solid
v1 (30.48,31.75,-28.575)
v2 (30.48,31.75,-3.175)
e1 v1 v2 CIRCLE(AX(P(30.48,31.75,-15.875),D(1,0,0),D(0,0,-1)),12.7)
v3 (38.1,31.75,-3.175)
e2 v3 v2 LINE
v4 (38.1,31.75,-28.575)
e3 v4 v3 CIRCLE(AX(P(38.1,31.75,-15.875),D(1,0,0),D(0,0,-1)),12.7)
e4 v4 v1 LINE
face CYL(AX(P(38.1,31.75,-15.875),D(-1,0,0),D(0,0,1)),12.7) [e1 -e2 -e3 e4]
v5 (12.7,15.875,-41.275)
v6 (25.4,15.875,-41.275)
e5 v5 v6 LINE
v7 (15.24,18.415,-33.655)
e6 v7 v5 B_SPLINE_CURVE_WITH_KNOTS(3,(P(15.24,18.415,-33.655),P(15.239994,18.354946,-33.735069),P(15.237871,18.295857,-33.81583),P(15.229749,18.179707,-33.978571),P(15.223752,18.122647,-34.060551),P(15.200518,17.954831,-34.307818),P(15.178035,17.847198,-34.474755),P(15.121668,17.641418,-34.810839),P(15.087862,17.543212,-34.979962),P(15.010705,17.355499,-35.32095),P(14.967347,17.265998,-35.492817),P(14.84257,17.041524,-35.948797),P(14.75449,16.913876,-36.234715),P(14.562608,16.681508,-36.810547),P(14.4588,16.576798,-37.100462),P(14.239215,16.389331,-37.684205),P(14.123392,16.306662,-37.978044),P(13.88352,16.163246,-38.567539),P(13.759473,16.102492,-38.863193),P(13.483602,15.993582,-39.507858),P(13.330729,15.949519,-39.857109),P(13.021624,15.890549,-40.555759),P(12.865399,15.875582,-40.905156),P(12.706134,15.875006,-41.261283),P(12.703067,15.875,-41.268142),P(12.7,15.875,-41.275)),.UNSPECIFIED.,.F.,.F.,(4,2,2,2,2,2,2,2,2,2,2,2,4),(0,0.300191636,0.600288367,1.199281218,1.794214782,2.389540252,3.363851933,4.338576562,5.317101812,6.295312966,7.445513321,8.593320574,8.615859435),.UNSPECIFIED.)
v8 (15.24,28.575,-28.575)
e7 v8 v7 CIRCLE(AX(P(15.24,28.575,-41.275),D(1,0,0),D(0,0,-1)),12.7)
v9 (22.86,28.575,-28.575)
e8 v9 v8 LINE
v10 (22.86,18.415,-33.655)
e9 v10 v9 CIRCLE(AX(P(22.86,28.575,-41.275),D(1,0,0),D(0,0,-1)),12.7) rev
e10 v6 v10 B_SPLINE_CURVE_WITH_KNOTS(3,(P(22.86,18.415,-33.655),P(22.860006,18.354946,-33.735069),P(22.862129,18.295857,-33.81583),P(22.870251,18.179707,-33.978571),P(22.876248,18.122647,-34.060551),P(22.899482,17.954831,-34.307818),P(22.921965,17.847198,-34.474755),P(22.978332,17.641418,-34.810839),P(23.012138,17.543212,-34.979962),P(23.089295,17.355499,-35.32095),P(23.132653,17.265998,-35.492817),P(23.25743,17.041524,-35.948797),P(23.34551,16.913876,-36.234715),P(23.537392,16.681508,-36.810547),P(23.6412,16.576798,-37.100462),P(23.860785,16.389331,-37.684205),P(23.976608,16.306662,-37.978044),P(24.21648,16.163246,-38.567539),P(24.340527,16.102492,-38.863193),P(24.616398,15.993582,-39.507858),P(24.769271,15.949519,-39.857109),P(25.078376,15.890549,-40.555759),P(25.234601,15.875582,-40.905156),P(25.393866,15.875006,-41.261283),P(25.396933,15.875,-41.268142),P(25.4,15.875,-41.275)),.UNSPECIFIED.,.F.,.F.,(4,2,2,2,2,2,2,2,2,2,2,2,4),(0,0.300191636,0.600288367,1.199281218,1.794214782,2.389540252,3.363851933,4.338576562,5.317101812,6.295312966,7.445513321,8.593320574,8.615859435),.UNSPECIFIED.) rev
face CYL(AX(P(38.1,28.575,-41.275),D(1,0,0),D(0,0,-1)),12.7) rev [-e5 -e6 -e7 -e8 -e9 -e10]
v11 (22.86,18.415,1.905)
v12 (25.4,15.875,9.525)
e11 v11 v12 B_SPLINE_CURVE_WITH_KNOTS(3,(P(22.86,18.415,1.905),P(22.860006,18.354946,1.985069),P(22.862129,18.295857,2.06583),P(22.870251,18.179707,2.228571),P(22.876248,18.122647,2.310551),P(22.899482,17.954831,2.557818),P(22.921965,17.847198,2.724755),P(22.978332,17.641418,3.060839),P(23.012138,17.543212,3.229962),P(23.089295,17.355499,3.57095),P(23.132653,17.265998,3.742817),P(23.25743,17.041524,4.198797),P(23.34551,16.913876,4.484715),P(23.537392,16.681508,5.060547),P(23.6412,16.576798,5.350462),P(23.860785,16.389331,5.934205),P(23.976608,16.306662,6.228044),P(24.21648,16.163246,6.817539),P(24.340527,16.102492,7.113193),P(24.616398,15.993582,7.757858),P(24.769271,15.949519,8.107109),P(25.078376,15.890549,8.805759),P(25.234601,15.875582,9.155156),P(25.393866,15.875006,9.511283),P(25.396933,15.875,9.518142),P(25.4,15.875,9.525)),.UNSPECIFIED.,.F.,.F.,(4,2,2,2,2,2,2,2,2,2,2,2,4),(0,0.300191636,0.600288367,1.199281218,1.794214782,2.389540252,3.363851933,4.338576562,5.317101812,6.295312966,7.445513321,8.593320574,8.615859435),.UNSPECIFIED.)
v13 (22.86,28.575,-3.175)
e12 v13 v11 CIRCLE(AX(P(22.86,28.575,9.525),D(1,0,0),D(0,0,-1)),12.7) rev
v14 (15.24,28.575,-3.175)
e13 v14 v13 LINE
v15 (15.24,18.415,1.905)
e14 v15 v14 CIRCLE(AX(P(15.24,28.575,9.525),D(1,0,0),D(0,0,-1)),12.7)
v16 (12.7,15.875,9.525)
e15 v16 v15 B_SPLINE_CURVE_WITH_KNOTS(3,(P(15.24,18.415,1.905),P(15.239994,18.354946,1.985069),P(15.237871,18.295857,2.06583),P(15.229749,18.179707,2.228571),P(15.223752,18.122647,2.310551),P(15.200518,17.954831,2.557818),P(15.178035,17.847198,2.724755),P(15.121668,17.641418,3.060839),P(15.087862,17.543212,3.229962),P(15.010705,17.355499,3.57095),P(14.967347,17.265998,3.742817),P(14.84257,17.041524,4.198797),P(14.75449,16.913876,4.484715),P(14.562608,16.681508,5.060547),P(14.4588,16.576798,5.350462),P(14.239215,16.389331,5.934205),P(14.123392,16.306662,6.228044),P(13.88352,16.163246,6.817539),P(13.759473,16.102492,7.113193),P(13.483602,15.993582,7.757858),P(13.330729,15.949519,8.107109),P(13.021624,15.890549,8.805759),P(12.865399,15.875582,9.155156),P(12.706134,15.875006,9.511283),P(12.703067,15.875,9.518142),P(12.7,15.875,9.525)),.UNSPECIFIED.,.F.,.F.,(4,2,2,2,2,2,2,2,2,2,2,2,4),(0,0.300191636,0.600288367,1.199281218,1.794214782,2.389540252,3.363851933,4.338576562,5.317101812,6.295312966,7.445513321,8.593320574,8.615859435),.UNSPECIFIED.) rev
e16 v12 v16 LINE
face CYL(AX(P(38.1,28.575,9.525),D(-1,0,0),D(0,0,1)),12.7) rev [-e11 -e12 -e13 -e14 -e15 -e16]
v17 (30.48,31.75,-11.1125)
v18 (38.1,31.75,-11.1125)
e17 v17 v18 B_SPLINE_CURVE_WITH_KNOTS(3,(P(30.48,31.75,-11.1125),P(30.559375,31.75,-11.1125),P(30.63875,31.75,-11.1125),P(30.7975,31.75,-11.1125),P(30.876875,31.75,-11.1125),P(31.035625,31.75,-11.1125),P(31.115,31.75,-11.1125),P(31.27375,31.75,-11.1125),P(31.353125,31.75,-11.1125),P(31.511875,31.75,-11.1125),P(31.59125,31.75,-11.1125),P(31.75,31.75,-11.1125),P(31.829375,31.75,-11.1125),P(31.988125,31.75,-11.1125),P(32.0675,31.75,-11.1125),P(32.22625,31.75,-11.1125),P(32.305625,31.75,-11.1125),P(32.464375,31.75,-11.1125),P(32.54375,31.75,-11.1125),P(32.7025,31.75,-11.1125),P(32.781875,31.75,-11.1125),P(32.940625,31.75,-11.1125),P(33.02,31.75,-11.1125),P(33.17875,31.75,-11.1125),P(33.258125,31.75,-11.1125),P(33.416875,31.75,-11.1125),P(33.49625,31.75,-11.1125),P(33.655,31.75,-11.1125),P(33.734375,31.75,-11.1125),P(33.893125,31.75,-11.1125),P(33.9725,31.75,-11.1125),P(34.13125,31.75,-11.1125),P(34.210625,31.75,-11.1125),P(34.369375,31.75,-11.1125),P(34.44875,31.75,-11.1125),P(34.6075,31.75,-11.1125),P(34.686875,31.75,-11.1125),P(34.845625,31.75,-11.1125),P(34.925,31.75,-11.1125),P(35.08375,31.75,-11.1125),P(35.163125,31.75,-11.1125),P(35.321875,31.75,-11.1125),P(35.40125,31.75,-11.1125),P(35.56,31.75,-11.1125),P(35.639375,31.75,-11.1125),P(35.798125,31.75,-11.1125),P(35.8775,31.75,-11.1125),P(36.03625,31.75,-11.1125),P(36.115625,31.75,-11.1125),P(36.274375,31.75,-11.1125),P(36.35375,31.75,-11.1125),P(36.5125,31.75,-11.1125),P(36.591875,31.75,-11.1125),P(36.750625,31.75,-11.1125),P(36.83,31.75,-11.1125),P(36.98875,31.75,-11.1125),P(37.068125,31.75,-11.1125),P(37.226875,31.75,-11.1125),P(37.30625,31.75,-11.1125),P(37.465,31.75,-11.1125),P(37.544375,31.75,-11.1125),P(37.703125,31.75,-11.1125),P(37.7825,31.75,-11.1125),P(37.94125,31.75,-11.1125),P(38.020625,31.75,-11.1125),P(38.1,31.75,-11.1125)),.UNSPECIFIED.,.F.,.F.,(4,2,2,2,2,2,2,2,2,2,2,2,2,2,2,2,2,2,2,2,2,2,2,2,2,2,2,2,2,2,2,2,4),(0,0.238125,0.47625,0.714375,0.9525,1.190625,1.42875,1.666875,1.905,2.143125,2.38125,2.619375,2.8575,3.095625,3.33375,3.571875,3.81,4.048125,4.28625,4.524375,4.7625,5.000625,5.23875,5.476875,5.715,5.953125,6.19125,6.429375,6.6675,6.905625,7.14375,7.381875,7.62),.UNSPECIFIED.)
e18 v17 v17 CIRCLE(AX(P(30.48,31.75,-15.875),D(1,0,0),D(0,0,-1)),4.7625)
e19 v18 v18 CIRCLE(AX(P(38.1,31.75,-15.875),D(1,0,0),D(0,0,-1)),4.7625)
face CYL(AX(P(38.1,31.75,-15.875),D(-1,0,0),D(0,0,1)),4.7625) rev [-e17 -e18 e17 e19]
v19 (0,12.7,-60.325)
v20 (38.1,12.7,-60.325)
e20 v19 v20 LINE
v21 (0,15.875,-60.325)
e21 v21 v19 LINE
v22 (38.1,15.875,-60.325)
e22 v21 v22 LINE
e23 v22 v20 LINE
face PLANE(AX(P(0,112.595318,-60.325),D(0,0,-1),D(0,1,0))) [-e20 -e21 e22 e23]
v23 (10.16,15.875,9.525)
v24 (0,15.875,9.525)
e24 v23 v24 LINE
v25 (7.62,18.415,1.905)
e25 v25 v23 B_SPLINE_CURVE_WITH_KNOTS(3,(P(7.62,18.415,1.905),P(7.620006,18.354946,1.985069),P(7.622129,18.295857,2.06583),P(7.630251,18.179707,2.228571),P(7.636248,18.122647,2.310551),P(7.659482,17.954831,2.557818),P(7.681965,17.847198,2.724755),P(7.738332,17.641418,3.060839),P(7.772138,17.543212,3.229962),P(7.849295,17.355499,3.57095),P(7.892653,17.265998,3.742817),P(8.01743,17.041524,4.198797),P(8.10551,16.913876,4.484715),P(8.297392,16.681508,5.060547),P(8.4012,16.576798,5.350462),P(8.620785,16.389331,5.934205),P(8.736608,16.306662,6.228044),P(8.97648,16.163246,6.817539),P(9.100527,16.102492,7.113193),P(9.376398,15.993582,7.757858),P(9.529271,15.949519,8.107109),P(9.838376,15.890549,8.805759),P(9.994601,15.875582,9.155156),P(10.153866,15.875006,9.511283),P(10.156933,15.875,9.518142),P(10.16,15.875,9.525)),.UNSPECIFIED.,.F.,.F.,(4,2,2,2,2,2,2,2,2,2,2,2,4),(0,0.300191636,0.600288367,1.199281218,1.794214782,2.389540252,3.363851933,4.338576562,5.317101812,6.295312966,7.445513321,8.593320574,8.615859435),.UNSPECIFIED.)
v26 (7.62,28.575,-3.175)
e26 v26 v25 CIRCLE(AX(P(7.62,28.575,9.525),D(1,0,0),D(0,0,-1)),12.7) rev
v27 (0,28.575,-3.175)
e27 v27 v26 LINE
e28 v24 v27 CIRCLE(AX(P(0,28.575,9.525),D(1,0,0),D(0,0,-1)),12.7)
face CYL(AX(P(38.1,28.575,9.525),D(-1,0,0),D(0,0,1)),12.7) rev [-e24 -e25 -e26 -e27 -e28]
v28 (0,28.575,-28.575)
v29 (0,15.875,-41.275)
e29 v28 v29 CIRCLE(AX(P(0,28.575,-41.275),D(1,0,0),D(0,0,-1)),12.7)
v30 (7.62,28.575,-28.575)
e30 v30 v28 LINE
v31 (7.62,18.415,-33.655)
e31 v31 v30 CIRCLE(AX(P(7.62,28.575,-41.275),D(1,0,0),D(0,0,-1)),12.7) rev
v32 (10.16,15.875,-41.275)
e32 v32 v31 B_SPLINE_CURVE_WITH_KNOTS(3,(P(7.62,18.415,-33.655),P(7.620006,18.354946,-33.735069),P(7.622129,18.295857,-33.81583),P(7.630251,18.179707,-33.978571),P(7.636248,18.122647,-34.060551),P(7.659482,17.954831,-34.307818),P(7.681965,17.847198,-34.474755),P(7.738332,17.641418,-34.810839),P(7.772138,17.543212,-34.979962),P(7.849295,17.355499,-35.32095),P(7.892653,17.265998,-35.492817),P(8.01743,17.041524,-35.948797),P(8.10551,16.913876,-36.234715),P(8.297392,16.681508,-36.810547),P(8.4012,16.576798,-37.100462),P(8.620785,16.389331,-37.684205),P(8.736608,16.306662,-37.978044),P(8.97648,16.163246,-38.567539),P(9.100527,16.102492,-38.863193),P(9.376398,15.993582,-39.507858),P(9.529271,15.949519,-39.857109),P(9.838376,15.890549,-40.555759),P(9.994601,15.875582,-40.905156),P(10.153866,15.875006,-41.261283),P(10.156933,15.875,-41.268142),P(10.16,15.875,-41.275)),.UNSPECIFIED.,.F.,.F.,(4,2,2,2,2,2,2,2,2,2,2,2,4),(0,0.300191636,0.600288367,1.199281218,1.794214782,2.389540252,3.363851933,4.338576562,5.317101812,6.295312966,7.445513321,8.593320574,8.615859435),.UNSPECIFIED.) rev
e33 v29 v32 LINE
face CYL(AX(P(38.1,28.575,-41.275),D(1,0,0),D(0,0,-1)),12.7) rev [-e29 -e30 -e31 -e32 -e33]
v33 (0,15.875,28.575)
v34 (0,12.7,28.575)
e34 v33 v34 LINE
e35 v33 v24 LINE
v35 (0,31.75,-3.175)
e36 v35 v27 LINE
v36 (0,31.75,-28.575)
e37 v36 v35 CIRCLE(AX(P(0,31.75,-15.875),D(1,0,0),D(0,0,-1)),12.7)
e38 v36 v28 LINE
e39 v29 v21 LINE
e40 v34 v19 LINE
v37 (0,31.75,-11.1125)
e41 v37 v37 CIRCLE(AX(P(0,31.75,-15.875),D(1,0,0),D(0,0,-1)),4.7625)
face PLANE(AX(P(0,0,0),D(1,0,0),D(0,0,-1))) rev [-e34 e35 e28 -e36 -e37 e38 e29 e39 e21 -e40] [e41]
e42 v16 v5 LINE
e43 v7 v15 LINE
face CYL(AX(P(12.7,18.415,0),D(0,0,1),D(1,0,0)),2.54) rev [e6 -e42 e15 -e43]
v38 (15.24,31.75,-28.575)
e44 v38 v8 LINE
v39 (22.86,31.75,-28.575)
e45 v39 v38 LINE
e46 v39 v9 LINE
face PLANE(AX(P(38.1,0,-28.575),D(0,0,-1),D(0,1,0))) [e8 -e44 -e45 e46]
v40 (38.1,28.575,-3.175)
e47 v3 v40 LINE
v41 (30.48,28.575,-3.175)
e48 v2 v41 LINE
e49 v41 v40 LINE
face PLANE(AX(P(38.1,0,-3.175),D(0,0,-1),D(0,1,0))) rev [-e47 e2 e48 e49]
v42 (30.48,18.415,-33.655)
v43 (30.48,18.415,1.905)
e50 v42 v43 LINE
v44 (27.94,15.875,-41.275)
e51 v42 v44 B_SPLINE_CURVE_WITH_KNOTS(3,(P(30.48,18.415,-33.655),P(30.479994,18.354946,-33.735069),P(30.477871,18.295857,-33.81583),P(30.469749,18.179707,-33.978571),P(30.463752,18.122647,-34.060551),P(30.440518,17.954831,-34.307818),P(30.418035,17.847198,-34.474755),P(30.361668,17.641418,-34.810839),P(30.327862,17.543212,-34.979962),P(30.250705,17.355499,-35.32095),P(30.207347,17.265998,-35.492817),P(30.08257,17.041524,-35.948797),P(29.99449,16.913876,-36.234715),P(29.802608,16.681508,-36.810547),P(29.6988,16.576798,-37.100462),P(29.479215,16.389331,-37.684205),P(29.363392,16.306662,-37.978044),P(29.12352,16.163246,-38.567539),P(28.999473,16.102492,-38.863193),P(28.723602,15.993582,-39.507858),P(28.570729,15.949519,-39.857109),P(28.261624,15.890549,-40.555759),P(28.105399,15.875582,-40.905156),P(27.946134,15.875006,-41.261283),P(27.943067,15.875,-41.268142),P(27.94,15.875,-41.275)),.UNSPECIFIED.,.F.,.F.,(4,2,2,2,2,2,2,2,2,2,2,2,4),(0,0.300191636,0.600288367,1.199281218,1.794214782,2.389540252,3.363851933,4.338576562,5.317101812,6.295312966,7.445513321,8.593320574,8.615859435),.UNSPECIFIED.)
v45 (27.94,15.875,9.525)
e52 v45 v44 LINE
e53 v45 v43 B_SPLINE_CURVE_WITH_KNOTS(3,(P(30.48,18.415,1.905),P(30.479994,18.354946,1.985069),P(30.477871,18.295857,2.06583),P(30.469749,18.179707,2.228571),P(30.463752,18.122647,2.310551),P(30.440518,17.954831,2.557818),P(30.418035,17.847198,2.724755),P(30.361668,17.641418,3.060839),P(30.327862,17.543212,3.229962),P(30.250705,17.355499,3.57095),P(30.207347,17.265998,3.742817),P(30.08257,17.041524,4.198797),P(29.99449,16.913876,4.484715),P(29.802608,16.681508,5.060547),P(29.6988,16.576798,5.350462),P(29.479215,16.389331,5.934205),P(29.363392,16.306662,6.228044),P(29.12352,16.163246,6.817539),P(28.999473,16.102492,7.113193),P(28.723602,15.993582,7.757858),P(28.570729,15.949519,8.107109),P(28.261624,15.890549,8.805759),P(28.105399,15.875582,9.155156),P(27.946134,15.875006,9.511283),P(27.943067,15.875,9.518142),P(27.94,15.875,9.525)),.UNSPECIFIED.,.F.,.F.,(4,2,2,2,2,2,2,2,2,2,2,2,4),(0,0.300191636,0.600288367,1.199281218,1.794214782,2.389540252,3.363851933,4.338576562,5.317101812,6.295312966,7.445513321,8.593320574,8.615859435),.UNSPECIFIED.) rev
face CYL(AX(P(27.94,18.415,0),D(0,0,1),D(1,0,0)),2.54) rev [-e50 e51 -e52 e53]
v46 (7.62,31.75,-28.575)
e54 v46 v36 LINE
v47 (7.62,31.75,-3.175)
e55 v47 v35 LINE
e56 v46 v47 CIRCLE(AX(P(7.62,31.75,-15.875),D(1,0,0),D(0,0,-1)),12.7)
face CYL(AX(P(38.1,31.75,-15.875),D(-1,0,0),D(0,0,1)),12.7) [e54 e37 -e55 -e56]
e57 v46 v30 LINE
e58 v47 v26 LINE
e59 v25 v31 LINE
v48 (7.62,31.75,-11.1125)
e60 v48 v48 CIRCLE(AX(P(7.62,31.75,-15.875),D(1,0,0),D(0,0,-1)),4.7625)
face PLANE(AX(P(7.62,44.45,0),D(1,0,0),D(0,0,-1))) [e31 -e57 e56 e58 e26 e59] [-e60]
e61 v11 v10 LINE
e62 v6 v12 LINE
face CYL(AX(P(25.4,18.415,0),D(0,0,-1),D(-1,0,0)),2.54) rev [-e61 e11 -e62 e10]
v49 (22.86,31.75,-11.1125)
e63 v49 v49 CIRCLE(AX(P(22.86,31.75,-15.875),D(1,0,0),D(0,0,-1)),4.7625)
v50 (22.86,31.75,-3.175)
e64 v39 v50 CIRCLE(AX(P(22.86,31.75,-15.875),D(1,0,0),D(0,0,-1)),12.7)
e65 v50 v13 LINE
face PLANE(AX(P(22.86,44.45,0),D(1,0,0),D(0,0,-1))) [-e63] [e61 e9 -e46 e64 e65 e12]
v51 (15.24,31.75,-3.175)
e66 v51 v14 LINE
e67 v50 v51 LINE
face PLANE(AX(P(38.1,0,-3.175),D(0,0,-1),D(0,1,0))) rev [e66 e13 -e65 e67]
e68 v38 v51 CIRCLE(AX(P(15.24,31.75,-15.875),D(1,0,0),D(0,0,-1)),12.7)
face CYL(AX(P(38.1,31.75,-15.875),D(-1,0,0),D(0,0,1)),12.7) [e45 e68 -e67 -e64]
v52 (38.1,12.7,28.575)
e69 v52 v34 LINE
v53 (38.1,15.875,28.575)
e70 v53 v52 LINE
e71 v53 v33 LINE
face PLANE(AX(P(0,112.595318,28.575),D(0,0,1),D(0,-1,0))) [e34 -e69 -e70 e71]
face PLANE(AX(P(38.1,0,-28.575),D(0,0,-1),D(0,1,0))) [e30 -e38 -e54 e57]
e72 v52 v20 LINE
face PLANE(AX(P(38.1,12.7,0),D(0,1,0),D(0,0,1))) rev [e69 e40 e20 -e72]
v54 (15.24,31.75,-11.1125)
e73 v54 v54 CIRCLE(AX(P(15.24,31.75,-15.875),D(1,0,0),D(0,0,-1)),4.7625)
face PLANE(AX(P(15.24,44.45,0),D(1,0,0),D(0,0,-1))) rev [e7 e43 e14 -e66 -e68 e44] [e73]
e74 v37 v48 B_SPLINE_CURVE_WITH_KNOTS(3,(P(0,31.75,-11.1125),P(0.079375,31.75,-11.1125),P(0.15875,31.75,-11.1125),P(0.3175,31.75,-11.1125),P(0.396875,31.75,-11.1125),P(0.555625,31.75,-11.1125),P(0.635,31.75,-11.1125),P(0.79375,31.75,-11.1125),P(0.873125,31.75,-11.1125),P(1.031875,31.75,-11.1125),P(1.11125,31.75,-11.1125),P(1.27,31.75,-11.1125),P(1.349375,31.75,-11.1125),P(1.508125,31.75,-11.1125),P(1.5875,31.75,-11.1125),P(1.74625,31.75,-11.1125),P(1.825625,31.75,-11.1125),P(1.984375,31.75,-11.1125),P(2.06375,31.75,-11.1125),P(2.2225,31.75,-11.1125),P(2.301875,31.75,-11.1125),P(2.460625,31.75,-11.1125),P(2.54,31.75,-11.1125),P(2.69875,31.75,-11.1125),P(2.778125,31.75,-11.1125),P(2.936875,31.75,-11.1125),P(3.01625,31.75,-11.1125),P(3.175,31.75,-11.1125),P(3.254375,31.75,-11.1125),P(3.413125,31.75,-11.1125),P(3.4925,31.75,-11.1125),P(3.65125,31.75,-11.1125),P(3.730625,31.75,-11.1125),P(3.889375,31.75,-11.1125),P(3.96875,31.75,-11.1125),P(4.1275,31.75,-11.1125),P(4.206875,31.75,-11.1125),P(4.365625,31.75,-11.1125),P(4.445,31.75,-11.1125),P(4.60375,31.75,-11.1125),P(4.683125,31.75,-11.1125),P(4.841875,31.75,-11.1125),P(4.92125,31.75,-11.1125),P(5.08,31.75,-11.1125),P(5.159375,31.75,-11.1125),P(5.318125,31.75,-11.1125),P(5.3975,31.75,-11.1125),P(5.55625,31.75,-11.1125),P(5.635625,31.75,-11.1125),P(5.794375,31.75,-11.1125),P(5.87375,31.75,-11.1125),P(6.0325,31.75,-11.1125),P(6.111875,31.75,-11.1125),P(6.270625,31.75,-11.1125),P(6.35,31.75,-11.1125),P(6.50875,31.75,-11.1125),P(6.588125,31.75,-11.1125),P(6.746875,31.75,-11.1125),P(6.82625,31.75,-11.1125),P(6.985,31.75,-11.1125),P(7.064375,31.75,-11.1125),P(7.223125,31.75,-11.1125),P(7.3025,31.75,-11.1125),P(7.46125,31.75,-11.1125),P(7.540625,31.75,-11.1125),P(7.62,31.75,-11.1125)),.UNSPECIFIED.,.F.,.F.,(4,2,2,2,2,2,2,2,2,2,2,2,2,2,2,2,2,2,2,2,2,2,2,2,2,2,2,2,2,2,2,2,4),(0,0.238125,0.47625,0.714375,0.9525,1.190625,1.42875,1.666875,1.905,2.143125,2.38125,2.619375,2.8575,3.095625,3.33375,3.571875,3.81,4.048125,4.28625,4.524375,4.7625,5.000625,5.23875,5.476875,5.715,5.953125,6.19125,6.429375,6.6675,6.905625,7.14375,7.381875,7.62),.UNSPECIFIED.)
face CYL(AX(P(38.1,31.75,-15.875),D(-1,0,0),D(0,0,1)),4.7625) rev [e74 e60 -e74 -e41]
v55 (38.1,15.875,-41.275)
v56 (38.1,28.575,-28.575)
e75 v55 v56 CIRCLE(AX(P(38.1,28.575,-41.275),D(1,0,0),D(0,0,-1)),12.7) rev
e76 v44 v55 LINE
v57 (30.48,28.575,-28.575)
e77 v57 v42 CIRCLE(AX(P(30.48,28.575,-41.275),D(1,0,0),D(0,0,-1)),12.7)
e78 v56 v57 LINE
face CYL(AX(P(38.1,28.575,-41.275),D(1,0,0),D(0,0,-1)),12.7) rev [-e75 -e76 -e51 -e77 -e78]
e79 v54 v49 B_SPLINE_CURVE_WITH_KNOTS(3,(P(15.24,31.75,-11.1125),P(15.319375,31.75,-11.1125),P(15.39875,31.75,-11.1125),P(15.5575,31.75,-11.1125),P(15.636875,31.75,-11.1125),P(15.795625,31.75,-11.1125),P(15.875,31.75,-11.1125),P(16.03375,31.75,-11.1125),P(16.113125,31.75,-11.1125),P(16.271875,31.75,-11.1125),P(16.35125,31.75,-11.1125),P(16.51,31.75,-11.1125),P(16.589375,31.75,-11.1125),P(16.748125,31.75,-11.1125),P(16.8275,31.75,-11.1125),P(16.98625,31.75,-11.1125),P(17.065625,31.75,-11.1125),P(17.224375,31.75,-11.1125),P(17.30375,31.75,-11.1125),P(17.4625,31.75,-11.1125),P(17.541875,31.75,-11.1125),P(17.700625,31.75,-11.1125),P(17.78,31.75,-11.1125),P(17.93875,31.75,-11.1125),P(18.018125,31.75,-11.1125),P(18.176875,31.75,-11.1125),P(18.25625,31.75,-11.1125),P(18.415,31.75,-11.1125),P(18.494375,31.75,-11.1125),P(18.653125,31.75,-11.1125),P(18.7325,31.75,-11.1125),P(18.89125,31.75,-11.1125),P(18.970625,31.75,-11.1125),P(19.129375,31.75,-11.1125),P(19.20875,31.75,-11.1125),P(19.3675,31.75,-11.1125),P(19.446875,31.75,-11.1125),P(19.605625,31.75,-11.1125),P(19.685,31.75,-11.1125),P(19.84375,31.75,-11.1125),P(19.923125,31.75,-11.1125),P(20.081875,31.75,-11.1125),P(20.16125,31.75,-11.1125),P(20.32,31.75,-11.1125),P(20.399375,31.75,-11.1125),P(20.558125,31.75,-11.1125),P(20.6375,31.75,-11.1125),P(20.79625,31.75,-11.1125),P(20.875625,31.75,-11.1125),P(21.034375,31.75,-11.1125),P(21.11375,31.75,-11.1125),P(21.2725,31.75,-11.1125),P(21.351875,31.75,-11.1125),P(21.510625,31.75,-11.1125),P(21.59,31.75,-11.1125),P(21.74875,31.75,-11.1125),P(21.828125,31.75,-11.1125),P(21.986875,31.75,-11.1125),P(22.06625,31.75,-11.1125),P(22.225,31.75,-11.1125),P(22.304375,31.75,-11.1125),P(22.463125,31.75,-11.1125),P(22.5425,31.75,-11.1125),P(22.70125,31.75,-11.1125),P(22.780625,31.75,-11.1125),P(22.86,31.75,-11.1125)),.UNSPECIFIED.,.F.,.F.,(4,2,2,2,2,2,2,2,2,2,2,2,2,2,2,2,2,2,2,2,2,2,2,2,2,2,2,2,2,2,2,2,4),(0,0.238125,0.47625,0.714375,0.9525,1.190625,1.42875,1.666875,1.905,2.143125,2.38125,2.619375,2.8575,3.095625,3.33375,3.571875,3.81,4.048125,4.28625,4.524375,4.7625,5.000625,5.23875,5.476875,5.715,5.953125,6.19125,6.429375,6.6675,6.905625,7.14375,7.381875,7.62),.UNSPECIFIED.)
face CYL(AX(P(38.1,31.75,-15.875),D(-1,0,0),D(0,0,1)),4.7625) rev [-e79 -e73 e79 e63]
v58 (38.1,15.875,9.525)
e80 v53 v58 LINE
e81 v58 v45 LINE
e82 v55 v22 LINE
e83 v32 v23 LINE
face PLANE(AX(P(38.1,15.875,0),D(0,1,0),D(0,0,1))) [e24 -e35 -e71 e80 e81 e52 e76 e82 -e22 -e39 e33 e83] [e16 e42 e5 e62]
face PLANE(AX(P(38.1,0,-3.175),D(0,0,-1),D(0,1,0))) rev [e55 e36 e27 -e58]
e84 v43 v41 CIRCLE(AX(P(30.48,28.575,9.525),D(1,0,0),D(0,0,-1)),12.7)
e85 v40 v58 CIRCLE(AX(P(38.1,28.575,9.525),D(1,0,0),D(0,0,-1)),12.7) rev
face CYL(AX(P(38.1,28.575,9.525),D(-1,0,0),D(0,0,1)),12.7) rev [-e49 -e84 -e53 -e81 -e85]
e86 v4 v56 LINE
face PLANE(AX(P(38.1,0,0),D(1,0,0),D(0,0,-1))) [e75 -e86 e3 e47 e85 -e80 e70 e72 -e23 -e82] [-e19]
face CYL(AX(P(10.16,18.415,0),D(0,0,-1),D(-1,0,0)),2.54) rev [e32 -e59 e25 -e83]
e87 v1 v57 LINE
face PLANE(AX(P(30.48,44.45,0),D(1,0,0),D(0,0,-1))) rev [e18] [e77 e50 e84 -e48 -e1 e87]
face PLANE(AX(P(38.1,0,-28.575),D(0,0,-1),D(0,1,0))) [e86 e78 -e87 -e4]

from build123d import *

# Parameters (mm, degrees)
SKETCH1_R           = 4.762500000000008
BOSS_EXTRUDE1_DEPTH = 38.1
SKETCH3_W           = 3.1750000000000043
SKETCH3_H           = 31.750000000000004
CUT_EXTRUDE1_DEPTH  = 12.7
SKETCH4_W           = 7.62
SKETCH4_H           = 6.350000000000001
SKETCH4_W_2         = 7.619999999999997
CUT_EXTRUDE2_DEPTH  = 60.05841387981902
SKETCH6_W           = 31.749999999999986
SKETCH6_H           = 31.750000000000004
CUT_EXTRUDE3_DEPTH  = 12.7
SKETCH7_W           = 38.1
SKETCH7_H           = 88.89999999999999
BOSS_EXTRUDE2_DEPTH = 3.175
FILLET1_R           = 2.54
FILLET2_R           = 12.7


with BuildPart() as part:
    # Sketch1 → Boss-Extrude1 (new body)
    # profile 1 of 3: a face of its own
    with BuildSketch(Plane(origin=(0, 0, 0), x_dir=(0, 0, -1), z_dir=(1, 0, 0))):
        Polygon((0, 0), (31.75, 3.89e-15), (31.749999999999993, 12.700000000000003), (0, 12.7), align=None)
    # profile 2 of 3: a face of its own
    with BuildSketch(Plane(origin=(0, 0, 0), x_dir=(0, 0, -1), z_dir=(1, 0, 0))):
        Polygon((28.575000000000003, 15.875000000000004), (3.1749999999999963, 15.875), (-3.1750000000000034, 15.875), (-3.1750000000000034, 12.7), (0, 12.7), (31.749999999999993, 12.700000000000003), (34.925, 12.700000000000005), (34.925, 15.875000000000004), align=None)
    # profile 3 of 3: a face of its own
    with BuildSketch(Plane(origin=(0, 0, 0), x_dir=(0, 0, -1), z_dir=(1, 0, 0))):
        with BuildLine():
            ThreePointArc((28.574999999999996, 31.75), (15.874999999999991, 44.45), (3.17499999999999, 31.749999999999996))
            Line((3.1749999999999936, 31.75), (3.174999999999996, 15.875))
            Line((3.1749999999999963, 15.875), (28.575000000000003, 15.875000000000004))
            Line((28.575, 15.875000000000004), (28.574999999999996, 31.75))
        make_face()
        with Locations(Location((15.874999999999996, 31.75, 0), (0, 0, 180))):
            Circle(SKETCH1_R, mode=Mode.SUBTRACT)
    extrude(amount=BOSS_EXTRUDE1_DEPTH)

    # Sketch3 → Cut-Extrude1 (cut)
    with BuildSketch(Plane.XZ):
        with Locations((1.5875000000000021, -15.875000000000002)):
            Rectangle(SKETCH3_W, SKETCH3_H)
        Polygon((34.92499999999999, 0), (34.92499999999999, -31.749999999999993), (38.1, -31.75), (38.1, 0), align=None)
    extrude(amount=-CUT_EXTRUDE1_DEPTH, mode=Mode.SUBTRACT)

    # Sketch4 → Cut-Extrude2 (cut, through all)
    with BuildSketch(Plane(origin=(0, 15.875, 1.45e-15), x_dir=(1, 0, 0), z_dir=(0, 1, 9e-17))):
        Polygon((15.240000000000002, 28.574999999999996), (7.620000000000001, 28.574999999999996), (7.620000000000005, -3.1750000000000043), (15.240000000000007, -3.175000000000002), align=None)
        Polygon((30.48, 28.574999999999996), (22.860000000000003, 28.574999999999996), (22.860000000000007, -3.1750000000000043), (30.480000000000008, -3.175000000000002), align=None)
        with Locations((11.43, 31.749999999999996)):
            Rectangle(SKETCH4_W, SKETCH4_H)
        with Locations((26.67, 31.749999999999996)):
            Rectangle(SKETCH4_W_2, SKETCH4_H)
    extrude(amount=CUT_EXTRUDE2_DEPTH, mode=Mode.SUBTRACT)

    # Sketch6 → Cut-Extrude3 (cut)
    with BuildSketch(Plane.XZ):
        with Locations((19.049999999999997, -15.875000000000002)):
            Rectangle(SKETCH6_W, SKETCH6_H)
    extrude(amount=-CUT_EXTRUDE3_DEPTH, mode=Mode.SUBTRACT)

    # Sketch7 → Boss-Extrude2 (add)
    with BuildSketch(Plane.XZ.offset(-12.7)):
        with Locations((19.05, -15.875)):
            Rectangle(SKETCH7_W, SKETCH7_H)
    extrude(amount=-BOSS_EXTRUDE2_DEPTH)

    # Fillet1
    fillet1_edges = [part.edges().sort_by_distance(p)[0] for p in [
        (30.480000000000004, 15.875000000000002, -15.875),
        (22.860000000000003, 15.875000000000002, -15.875),
        (15.240000000000004, 15.875000000000002, -15.875),
        (7.620000000000003, 15.875000000000002, -15.875),
    ]]
    fillet(fillet1_edges, radius=FILLET1_R)

    # Fillet2
    fillet2_edges = [part.edges().sort_by_distance(p)[0] for p in [
        (33.02, 15.875, -3.1749999999999963),
    ]]
    fillet(fillet2_edges, radius=FILLET2_R)
    fillet2_2_edges = [part.edges().sort_by_distance(p)[0] for p in [
        (5.080000000000002, 15.875, -3.1749999999999963),
    ]]
    fillet(fillet2_2_edges, radius=FILLET2_R)
    fillet2_3_edges = [part.edges().sort_by_distance(p)[0] for p in [
        (5.08, 15.875000000000004, -28.575000000000003),
    ]]
    fillet(fillet2_3_edges, radius=FILLET2_R)
    fillet2_4_edges = [part.edges().sort_by_distance(p)[0] for p in [
        (33.02, 15.875000000000004, -28.575000000000003),
    ]]
    fillet(fillet2_4_edges, radius=FILLET2_R)
    fillet2_5_edges = [part.edges().sort_by_distance(p)[0] for p in [
        (19.050000000000008, 15.875, -3.174999999999996),
    ]]
    fillet(fillet2_5_edges, radius=FILLET2_R)
    fillet2_6_edges = [part.edges().sort_by_distance(p)[0] for p in [
        (19.050000000000004, 15.875000000000002, -28.575),
    ]]
    fillet(fillet2_6_edges, radius=FILLET2_R)


solid = part.part
